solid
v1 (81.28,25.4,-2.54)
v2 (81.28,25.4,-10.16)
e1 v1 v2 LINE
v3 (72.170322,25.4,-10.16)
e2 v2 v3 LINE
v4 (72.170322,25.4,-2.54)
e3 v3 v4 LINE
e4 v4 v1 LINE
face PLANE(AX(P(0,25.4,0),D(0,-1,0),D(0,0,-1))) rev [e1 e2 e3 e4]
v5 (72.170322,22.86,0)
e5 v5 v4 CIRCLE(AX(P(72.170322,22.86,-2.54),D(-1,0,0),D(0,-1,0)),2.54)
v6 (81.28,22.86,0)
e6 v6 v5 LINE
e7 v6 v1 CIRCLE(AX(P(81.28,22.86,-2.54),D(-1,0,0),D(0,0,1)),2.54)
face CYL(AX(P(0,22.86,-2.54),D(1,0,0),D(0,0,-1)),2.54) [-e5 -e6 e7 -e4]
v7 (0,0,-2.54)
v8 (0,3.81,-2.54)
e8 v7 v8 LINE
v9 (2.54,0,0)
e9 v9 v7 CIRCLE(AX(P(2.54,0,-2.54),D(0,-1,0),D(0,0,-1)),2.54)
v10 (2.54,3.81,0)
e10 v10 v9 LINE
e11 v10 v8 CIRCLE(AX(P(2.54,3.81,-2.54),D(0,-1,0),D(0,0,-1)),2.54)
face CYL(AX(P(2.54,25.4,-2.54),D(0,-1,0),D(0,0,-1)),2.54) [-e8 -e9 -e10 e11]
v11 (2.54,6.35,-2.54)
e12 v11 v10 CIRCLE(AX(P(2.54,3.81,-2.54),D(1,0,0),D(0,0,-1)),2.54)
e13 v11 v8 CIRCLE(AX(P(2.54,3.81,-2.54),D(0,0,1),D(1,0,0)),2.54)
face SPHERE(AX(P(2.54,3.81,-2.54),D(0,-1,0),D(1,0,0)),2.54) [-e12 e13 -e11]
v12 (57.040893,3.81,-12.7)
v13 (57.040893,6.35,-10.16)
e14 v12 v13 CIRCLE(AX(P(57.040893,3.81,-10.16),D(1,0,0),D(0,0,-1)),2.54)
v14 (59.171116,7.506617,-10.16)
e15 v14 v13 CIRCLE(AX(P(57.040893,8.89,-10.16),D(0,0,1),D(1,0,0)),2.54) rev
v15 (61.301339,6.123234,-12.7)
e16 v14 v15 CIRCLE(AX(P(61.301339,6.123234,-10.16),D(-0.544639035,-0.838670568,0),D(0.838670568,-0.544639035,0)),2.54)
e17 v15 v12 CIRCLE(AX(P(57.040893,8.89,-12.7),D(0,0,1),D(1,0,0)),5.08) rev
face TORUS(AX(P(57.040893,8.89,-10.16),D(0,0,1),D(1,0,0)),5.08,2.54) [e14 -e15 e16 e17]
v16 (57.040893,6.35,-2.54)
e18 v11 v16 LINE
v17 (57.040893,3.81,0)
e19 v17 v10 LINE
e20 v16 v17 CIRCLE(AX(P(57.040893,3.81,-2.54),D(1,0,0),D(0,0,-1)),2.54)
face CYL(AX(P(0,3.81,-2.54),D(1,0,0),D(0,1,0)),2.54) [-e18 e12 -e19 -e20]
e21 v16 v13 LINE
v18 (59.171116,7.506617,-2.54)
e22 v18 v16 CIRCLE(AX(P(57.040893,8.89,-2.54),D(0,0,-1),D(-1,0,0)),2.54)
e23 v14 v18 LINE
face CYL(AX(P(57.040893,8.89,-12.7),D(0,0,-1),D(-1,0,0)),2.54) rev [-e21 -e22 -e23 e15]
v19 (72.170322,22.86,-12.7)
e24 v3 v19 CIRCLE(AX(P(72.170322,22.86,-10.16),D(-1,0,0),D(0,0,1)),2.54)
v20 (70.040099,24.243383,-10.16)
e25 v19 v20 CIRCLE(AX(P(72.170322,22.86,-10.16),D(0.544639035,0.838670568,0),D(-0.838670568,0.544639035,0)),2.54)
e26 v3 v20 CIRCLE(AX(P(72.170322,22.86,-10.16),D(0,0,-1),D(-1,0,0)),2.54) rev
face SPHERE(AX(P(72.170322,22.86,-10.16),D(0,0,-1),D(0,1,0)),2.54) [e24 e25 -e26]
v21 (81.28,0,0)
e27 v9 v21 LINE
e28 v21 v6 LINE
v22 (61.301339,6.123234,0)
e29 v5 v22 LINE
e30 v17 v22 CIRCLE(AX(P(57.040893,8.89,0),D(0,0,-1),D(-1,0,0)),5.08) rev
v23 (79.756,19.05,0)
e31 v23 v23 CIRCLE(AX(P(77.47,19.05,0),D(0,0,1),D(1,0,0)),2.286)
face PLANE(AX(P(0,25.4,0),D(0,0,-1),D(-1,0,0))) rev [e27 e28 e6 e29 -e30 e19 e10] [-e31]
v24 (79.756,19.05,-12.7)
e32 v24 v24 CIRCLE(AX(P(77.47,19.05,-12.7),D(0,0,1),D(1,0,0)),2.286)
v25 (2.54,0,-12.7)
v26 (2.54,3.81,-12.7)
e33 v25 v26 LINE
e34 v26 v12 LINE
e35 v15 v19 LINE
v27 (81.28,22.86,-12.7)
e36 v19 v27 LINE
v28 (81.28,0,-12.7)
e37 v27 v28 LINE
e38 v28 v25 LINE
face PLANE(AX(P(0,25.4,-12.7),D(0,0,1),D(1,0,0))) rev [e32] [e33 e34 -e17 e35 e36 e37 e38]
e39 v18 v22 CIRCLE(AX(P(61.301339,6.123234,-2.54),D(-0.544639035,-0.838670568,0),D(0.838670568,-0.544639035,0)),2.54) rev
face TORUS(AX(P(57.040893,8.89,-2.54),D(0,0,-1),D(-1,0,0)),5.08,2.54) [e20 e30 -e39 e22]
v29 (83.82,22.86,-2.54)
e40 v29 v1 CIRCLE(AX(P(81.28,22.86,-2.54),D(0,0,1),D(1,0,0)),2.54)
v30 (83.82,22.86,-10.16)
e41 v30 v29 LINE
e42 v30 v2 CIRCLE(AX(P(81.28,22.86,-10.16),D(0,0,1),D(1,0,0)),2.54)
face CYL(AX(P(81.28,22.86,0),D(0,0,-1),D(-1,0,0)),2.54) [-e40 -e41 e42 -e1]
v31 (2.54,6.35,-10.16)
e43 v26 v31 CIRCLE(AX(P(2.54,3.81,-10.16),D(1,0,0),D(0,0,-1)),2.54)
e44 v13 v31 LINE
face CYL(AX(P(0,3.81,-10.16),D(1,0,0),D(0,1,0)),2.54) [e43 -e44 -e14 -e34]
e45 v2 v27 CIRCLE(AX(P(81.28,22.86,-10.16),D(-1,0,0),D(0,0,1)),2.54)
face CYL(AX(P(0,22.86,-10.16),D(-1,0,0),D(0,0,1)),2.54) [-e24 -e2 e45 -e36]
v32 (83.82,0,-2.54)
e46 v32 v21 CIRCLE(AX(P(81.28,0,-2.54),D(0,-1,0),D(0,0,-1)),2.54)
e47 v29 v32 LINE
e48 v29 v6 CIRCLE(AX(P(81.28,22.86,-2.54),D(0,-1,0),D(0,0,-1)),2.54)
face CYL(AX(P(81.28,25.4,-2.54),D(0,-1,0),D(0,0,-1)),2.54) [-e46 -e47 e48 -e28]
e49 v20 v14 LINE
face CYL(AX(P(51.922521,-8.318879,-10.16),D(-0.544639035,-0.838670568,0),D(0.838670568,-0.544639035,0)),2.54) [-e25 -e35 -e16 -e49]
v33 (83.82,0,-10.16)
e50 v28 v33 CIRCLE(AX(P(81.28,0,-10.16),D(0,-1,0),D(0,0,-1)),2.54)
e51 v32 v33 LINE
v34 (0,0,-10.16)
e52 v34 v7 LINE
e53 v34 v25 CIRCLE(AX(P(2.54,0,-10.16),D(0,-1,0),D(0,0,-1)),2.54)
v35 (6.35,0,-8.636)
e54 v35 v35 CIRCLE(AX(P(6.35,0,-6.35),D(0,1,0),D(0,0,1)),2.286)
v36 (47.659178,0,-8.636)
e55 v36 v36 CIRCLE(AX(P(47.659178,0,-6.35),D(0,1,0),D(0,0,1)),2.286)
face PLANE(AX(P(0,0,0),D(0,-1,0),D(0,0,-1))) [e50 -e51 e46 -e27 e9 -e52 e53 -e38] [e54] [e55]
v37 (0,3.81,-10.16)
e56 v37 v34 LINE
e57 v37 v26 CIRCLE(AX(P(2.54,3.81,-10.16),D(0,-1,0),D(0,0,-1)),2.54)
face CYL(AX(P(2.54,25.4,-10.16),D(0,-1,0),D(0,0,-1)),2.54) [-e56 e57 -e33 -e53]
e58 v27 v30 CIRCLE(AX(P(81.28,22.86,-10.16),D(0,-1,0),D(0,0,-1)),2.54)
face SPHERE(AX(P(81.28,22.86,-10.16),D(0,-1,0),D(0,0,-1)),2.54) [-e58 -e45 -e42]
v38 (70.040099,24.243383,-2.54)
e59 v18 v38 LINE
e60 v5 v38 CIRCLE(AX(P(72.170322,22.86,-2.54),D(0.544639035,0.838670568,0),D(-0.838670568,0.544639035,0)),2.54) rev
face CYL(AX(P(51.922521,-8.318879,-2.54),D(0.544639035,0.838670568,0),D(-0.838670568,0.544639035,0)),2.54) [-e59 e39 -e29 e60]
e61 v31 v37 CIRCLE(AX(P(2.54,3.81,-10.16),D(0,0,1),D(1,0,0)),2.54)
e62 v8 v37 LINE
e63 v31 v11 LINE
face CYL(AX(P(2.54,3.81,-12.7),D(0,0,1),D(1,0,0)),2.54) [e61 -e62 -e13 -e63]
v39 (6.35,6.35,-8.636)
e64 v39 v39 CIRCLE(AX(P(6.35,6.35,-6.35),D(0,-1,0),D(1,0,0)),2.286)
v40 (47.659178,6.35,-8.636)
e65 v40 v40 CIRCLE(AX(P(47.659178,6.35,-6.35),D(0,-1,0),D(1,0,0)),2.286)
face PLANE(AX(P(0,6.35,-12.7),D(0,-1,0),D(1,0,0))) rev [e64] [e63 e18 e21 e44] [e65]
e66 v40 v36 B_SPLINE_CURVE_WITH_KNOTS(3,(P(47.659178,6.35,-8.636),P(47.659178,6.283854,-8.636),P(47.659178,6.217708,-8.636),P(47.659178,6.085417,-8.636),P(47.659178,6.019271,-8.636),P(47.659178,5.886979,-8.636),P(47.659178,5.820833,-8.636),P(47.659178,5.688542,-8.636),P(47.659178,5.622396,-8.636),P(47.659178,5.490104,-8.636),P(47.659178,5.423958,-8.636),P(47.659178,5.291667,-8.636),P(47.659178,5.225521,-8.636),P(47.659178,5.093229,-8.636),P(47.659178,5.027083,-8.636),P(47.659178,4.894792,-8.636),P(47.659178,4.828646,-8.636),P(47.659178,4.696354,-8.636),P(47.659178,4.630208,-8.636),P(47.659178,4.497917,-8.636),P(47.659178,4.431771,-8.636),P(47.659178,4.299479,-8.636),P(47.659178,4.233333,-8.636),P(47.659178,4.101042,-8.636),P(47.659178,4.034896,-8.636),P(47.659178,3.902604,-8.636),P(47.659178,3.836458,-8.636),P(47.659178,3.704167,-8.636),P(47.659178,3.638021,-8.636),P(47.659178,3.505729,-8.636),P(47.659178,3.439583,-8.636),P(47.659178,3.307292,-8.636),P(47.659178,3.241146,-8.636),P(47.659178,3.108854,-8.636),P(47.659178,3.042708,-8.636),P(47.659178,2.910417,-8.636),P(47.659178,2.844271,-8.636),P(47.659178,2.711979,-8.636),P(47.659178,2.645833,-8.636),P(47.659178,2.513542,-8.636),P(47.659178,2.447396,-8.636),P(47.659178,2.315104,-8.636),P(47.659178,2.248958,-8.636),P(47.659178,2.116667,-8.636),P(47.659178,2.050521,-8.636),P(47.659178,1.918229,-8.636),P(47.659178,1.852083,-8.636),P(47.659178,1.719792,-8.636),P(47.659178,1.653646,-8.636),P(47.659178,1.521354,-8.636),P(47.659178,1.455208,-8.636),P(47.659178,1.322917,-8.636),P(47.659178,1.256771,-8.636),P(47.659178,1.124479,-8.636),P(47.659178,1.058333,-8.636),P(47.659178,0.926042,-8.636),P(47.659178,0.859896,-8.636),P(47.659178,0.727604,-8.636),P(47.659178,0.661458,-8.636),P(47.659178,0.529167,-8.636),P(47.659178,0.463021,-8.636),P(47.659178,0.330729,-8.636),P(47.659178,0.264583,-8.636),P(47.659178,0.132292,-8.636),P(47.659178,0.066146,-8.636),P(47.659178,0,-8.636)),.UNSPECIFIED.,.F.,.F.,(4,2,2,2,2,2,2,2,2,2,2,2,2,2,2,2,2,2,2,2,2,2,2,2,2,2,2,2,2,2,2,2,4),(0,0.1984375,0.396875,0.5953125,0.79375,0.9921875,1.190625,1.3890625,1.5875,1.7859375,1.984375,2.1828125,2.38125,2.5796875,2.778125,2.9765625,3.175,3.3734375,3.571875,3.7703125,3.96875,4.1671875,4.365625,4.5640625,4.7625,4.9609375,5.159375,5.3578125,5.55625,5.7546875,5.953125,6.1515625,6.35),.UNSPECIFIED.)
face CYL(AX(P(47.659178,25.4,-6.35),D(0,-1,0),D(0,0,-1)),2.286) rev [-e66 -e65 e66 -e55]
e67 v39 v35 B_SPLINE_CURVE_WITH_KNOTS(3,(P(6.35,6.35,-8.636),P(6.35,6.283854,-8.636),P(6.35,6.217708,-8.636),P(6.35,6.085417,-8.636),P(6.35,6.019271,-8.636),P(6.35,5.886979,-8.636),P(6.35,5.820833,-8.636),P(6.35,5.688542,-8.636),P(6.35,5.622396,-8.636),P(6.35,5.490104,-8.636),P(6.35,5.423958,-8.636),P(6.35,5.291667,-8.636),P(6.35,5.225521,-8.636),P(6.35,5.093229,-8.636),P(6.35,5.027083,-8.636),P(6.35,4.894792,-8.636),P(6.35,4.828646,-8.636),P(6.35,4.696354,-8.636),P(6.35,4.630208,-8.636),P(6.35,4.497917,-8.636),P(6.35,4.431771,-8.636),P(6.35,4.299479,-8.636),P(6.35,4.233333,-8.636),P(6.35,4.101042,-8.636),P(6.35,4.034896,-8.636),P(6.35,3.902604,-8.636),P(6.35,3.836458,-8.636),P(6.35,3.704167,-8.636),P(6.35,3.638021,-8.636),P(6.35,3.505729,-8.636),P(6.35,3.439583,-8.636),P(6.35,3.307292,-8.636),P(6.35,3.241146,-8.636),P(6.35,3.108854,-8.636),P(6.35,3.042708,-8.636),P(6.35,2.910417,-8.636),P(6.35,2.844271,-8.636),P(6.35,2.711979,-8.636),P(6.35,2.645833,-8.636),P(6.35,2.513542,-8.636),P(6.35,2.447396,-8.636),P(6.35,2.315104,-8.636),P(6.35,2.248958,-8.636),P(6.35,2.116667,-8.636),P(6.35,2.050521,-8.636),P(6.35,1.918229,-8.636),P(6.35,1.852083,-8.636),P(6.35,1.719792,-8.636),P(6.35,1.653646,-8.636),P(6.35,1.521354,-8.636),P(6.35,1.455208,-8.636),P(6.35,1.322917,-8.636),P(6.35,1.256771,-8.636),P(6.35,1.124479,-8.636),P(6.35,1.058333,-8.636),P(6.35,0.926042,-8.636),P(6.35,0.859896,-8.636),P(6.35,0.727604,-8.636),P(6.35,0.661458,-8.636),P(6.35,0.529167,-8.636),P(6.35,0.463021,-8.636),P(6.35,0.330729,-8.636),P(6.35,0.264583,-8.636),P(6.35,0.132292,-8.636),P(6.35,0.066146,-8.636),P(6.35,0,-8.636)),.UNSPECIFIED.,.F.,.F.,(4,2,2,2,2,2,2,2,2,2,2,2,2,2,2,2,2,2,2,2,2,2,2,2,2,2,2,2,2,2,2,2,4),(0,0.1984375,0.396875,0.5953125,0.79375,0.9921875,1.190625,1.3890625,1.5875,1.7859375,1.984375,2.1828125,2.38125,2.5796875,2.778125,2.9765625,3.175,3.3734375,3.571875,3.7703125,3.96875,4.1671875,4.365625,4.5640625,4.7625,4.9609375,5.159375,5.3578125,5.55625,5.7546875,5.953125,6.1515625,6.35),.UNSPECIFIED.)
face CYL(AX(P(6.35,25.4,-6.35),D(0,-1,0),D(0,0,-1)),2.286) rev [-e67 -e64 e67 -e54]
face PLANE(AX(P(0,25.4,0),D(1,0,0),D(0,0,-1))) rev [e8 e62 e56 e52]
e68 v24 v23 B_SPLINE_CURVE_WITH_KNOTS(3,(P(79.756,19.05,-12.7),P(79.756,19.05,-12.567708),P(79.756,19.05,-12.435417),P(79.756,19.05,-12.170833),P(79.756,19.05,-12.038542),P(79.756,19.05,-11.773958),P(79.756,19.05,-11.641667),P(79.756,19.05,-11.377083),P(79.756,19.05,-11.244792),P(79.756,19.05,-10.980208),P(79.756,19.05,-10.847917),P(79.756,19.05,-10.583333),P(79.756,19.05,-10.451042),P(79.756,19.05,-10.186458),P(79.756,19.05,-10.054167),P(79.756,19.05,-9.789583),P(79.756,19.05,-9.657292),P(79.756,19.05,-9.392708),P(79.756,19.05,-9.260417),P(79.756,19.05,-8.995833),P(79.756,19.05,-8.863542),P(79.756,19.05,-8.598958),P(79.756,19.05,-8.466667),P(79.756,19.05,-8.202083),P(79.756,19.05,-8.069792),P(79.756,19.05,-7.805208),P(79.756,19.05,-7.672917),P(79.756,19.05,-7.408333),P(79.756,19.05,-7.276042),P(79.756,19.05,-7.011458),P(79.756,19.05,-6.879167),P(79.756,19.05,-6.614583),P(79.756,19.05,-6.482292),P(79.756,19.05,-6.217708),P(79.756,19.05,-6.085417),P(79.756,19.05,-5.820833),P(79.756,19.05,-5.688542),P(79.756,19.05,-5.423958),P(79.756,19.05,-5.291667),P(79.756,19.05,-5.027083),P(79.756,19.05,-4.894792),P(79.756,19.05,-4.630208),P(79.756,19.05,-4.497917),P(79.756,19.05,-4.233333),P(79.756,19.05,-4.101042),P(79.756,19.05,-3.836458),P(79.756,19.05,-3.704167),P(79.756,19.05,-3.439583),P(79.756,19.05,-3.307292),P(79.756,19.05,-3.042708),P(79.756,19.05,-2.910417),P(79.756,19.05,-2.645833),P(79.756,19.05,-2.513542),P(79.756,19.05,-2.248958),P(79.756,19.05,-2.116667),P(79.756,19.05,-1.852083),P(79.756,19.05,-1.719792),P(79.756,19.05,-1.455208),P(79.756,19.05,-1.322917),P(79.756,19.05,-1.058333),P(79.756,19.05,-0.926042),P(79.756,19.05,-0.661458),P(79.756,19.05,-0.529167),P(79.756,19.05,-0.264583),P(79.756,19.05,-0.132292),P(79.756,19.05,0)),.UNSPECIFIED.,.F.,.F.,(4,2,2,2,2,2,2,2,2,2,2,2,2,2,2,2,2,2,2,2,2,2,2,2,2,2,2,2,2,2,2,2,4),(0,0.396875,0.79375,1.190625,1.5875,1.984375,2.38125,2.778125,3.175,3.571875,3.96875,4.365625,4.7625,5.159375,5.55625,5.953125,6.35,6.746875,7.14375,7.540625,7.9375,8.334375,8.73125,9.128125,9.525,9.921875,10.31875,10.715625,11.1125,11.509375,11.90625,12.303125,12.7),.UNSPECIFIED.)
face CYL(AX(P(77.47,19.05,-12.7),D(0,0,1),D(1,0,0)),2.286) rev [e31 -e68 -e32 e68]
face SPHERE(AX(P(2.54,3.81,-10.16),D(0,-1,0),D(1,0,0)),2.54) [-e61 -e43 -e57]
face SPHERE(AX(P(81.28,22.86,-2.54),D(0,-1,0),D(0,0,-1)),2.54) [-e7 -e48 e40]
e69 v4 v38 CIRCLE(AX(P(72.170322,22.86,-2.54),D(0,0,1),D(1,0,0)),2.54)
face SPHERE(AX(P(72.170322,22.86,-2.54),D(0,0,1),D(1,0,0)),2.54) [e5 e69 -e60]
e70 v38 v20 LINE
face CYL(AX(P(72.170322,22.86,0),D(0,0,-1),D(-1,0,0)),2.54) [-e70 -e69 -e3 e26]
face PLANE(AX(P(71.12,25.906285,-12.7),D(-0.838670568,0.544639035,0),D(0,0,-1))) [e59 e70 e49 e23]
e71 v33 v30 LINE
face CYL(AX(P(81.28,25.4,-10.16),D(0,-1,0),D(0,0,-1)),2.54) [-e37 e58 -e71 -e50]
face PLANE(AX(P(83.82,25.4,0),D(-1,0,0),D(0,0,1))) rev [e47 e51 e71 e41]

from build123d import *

# Parameters (mm, degrees)
SKETCH1_W           = 83.82
SKETCH1_H           = 12.7
SKETCH1_R           = 2.286
BOSS_EXTRUDE1_DEPTH = 25.4
SKETCH2_R           = 2.286
CUT_EXTRUDE1_DEPTH  = 12.7
FILLET1_R           = 2.54
SKETCH3_W           = 71.12
SKETCH3_H           = 19.05
CUT_EXTRUDE2_DEPTH  = 89.499957062
CHAMFER1_SIZE       = 19.55628504
CHAMFER1_SIZE_2     = 12.7
FILLET2_R           = 2.54


with BuildPart() as part:
    # Sketch1 → Boss-Extrude1 (new body)
    with BuildSketch(Plane(origin=(0, 0, 0), x_dir=(1, 0, 0), z_dir=(0, 1, 0))):
        with Locations((41.91, 6.35)):
            Rectangle(SKETCH1_W, SKETCH1_H)
        with Locations(Location((6.35, 6.35, 0), (0, 0, 90))):
            Circle(SKETCH1_R, mode=Mode.SUBTRACT)
        with Locations(Location((47.659178157, 6.35, 0), (0, 0, 90))):
            Circle(SKETCH1_R, mode=Mode.SUBTRACT)
    extrude(amount=BOSS_EXTRUDE1_DEPTH)

    # Sketch2 → Cut-Extrude1 (cut)
    with BuildSketch(Plane.XY):
        with Locations((77.47, 19.05)):
            Circle(SKETCH2_R)
    extrude(amount=-CUT_EXTRUDE1_DEPTH, mode=Mode.SUBTRACT)

    # Fillet1
    fillet1_edges = [part.edges().sort_by_distance(p)[0] for p in [
        (0, 12.7, -12.7),
        (83.82, 12.7, -12.7),
        (83.82, 12.7, 0),
        (0, 12.7, 0),
    ]]
    fillet(fillet1_edges, radius=FILLET1_R)

    # Sketch3 → Cut-Extrude2 (cut, through all)
    with BuildSketch(Plane.XY):
        with Locations((35.56, 15.875)):
            Rectangle(SKETCH3_W, SKETCH3_H)
    extrude(amount=-CUT_EXTRUDE2_DEPTH, mode=Mode.SUBTRACT)

    # Chamfer1
    # the kernel refuses this chamfer: 19.55628504, 12.7 mm, written as the material it adds along each edge
    with BuildSketch(Plane(origin=(71.12, 6.35, 0), x_dir=(0.021073765466273545, 0.9997779235455604, 0), z_dir=(0, 0, -1))) as chamfer1_piece_1_section:
        Polygon((CHAMFER1_SIZE * 0.999777923568, -CHAMFER1_SIZE * 0.0210737654668), (-CHAMFER1_SIZE_2 * 0.0210737654663, -CHAMFER1_SIZE_2 * 0.999777923546), (0, 0), align=None)
    chamfer1_piece_1 = extrude(amount=12.7, mode=Mode.PRIVATE)
    chamfer1_piece_1 = split(chamfer1_piece_1, bisect_by=Plane(origin=(66.98884067, 25.4, -6.35), z_dir=(0, -1, 0)), keep=Keep.TOP, mode=Mode.PRIVATE)
    add(chamfer1_piece_1)

    # Fillet2
    fillet2_edges = [part.edges().sort_by_distance(p)[0] for p in [
        (76.035607325, 25.4, -12.7),
        (83.82, 25.4, -6.35),
        (83.076051224, 25.4, -0.743948776),
        (83.076051224, 25.4, -11.956051224),
        (0.743948776, 6.35, -0.743948776),
        (76.035607325, 25.4, 0),
        (0, 6.35, -6.35),
        (0.743948776, 6.35, -11.956051224),
        (30.48, 6.35, -12.7),
        (30.48, 6.35, 0),
        (58.42, 6.35, -6.35),
        (70.79121465, 25.4, -6.35),
        (64.605607325, 15.875, 0),
        (64.605607325, 15.875, -12.7),
    ]]
    fillet(fillet2_edges, radius=FILLET2_R)


solid = part.part
